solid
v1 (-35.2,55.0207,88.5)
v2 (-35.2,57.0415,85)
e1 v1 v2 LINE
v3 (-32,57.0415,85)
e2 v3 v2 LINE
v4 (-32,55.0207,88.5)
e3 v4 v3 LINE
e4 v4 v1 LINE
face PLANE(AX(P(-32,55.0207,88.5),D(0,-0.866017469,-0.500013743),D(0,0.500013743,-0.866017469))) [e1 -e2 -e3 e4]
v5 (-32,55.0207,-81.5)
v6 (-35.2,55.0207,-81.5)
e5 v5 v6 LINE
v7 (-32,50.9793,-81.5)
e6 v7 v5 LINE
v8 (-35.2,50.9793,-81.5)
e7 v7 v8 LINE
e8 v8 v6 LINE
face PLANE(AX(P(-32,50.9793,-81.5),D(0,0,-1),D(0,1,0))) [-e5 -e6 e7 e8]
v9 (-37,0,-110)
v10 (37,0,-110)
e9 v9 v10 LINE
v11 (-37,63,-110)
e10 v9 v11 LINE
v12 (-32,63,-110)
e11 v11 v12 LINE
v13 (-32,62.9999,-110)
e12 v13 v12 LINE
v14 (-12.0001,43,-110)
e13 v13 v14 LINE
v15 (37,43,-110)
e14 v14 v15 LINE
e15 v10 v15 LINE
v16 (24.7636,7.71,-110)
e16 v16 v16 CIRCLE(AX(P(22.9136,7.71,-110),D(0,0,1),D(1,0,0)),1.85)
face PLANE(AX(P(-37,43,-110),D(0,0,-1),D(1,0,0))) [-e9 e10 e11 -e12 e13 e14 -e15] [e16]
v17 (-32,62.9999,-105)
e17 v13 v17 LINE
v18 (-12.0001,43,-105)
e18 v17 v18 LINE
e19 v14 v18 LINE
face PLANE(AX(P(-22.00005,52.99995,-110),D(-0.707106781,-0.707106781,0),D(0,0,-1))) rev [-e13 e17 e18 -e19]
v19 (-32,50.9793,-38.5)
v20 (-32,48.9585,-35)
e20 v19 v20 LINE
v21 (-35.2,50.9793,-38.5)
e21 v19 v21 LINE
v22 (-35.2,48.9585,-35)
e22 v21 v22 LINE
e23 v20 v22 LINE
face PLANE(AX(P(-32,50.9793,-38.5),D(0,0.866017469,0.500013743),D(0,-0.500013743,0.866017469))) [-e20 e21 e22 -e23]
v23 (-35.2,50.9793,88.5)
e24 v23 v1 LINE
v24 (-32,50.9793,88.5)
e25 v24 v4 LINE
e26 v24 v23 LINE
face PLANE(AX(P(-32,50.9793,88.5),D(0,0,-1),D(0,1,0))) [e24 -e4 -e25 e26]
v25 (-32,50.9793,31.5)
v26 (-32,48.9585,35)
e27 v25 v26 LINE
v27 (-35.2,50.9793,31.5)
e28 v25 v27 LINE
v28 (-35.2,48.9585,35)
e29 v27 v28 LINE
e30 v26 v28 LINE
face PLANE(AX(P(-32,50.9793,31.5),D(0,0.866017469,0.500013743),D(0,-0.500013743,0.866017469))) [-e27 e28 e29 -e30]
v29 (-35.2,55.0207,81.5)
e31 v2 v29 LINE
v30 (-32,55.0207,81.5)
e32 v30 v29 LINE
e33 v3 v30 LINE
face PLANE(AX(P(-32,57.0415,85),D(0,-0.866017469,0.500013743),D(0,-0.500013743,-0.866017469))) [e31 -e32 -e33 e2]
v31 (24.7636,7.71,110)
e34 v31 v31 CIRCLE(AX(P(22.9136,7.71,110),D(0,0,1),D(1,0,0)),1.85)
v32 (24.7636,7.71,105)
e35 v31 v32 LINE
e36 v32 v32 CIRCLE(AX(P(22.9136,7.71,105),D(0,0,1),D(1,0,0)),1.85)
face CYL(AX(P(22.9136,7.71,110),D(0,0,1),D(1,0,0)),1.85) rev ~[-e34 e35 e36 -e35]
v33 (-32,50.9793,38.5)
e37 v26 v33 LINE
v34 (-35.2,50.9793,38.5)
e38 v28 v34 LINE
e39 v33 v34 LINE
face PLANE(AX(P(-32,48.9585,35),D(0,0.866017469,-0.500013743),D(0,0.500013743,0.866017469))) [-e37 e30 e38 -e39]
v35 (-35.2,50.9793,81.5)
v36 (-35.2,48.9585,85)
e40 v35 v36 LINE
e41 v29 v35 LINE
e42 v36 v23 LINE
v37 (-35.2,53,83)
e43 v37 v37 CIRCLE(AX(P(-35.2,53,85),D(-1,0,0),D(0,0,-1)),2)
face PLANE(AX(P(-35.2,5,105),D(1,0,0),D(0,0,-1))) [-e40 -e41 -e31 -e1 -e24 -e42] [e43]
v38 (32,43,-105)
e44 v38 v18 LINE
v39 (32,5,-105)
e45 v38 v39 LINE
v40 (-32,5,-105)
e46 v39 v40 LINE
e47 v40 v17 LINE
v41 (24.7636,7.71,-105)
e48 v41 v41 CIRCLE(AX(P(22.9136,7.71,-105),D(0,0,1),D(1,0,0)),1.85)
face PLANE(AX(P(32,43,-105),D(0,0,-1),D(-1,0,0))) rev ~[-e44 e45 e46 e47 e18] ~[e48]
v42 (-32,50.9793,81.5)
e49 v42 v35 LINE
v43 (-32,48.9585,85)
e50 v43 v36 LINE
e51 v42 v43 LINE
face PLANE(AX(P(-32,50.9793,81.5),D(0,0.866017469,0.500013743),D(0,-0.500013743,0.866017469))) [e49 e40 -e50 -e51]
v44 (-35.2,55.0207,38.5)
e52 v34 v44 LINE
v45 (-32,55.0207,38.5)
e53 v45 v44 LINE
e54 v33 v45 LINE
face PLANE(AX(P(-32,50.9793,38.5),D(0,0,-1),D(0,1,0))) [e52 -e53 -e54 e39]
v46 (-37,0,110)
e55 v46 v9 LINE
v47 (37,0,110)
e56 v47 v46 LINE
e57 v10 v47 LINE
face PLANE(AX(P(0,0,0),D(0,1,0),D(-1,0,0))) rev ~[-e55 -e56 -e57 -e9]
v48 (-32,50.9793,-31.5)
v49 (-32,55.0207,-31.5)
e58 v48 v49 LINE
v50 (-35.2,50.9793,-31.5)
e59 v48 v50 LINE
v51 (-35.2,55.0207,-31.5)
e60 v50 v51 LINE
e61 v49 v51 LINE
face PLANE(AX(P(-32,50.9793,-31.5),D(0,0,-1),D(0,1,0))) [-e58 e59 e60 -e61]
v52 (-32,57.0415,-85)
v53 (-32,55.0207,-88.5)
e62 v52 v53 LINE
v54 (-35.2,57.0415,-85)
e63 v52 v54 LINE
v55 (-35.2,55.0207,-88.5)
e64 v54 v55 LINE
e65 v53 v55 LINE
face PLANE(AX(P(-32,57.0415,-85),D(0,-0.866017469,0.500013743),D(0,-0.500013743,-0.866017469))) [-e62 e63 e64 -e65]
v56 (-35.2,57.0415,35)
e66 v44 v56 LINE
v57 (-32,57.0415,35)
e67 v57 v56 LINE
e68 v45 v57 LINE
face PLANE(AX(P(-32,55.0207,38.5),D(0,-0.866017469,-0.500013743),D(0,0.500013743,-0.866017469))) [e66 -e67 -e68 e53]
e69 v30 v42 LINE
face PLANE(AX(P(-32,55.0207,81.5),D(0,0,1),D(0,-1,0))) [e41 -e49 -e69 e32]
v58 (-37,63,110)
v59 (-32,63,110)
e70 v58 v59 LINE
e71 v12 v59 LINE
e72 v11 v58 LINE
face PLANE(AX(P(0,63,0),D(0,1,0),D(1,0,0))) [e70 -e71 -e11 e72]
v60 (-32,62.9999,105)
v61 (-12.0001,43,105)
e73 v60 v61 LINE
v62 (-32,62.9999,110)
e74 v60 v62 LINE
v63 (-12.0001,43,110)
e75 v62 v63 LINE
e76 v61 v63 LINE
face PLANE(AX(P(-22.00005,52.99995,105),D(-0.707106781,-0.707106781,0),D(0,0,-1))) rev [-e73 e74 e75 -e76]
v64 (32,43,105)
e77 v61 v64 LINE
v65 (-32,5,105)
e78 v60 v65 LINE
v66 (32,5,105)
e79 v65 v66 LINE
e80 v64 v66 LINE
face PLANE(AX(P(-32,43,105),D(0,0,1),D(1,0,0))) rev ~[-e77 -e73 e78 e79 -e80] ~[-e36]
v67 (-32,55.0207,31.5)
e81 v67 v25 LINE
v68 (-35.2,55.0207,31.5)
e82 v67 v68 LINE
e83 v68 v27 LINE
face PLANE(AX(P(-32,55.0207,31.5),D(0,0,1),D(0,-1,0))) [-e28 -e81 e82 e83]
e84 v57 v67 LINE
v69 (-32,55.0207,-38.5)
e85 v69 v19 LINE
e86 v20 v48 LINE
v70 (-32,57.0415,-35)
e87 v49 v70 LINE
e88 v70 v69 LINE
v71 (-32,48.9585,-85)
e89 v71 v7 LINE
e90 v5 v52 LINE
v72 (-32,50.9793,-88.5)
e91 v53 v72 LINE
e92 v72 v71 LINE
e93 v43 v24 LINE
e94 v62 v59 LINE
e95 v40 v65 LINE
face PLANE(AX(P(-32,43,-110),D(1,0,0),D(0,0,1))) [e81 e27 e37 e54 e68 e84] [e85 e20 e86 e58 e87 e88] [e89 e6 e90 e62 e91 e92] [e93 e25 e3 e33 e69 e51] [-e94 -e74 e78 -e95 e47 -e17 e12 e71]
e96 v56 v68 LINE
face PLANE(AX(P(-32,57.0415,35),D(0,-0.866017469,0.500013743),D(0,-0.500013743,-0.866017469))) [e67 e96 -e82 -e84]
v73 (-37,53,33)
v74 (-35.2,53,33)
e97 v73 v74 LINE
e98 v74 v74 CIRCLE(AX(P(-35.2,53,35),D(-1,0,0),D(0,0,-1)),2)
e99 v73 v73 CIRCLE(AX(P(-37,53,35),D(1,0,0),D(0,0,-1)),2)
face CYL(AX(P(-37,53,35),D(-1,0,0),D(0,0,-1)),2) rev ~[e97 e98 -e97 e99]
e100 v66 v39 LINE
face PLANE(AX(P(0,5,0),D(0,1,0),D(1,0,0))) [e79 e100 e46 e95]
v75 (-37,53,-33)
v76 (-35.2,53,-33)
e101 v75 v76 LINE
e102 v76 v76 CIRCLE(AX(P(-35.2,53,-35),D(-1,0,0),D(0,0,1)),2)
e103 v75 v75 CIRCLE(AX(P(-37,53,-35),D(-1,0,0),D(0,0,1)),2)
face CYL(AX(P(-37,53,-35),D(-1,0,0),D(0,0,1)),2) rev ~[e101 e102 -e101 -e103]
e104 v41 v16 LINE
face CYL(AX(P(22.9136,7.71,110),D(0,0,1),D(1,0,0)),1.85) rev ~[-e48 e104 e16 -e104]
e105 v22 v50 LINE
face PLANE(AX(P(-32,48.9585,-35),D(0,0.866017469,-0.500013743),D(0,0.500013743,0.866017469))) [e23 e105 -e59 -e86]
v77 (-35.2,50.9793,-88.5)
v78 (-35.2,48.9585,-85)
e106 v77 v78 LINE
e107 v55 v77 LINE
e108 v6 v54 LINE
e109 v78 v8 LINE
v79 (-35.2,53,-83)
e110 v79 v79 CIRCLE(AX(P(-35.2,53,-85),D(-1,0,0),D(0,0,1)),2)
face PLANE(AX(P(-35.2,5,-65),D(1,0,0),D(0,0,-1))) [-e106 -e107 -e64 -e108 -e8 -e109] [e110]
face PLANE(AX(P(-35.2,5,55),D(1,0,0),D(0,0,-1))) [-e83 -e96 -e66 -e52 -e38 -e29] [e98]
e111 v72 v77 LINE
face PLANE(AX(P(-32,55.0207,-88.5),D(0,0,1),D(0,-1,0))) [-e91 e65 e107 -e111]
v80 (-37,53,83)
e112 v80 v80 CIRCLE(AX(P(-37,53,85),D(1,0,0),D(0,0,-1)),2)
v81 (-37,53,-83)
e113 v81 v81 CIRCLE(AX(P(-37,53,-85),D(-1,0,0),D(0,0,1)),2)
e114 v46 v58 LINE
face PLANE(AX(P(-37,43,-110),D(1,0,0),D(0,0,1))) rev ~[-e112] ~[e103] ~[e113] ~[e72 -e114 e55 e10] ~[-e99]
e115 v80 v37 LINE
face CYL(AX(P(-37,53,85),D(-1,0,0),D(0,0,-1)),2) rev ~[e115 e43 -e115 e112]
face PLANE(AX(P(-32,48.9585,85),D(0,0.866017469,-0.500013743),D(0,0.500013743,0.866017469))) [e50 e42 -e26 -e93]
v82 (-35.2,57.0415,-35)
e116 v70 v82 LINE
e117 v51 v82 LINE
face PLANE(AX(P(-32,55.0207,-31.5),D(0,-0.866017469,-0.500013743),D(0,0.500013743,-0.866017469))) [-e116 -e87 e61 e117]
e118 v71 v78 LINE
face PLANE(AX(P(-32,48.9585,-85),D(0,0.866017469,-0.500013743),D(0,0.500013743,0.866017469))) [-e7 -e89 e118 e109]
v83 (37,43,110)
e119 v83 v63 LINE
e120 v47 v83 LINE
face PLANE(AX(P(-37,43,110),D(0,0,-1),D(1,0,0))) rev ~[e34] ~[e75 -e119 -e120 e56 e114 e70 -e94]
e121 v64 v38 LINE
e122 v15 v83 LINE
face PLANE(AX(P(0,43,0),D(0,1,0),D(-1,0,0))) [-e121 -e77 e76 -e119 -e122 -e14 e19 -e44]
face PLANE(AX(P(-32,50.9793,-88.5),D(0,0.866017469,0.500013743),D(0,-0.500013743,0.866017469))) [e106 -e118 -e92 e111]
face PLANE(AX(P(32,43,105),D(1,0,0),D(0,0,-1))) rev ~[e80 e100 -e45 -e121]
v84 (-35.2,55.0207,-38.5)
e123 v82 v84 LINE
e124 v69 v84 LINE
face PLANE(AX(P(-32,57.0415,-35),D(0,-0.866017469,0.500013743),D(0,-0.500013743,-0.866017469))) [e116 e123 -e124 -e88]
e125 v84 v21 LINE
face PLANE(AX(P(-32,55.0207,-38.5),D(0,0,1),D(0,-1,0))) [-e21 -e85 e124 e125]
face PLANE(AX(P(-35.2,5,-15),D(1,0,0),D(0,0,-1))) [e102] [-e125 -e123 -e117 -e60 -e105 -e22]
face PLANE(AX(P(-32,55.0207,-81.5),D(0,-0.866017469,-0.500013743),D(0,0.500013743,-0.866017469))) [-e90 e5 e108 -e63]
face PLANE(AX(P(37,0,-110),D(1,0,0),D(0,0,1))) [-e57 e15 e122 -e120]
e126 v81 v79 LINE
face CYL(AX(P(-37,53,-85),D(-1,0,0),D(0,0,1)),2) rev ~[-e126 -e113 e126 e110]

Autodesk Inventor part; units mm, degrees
ref_plane "YZ Plane" through (0, 0, 0) normal (1, 0, 0) x (0, 1, 0)
ref_plane "XZ Plane" through (0, 0, 0) normal (0, 1, 0) x (-1, 0, 0)
ref_plane "XY Plane" through (0, 0, 0) normal (0, 0, 1) x (1, 0, 0)
sketch "Эскиз1" plane through (0, 0, 0) normal (0, 1, 0) x (-1, 0, 0)
  line L0 (-37, 110) -> (37, 110)
  line L1 (37, 110) -> (37, -110)
  line L2 (37, -110) -> (-37, -110)
  line L3 (-37, -110) -> (-37, 110)
  line L4 (-37, 110) -> (37, -110) construction
  line L5 (37, 110) -> (-37, -110) construction
  point P0 (0, 0)
  dimension "d0" = 74
  dimension "d1" = 220
extrude "Выдавливание1" add sketch "Эскиз1" along normal blind 43
sketch "Эскиз3" plane through (0, 43, 0) normal (0, 1, 0) x (1, 0, 0)
  line L0 (-32, -105) -> (32, -105)
  line L1 (32, -105) -> (32, 105)
  line L2 (32, 105) -> (-32, 105)
  line L3 (-32, 105) -> (-32, -105)
  line L4 (-32, -105) -> (32, 105) construction
  line L5 (32, -105) -> (-32, 105) construction
  line L6 (37, 110) -> (-37, 110) projected
  line L7 (-37, 110) -> (-37, -110) projected
  point P0 (0, 0)
  dimension "d4" = 5
  dimension "d5" = 5
extrude "Выдавливание2" cut sketch "Эскиз3" against normal blind 38
sketch "Эскиз4" plane through (0, 5, 0) normal (0, 1, 0) x (1, 0, 0)
  line L0 (32, 105) -> (32, -105) projected
  line L1 (32, 105) -> (0, 105)
  line L2 (0, 105) -> (0, 67.1211)
  line L3 (0, 67.1211) -> (32, 67.1211)
  line L4 (32, 67.1211) -> (32, 105)
  point P0 (0, 0)
sketch "Эскиз5" plane through (0, 43, 0) normal (0, 1, 0) x (1, 0, 0)
  line L0 (-37, 110) -> (-37, -110) projected
  line L1 (-37, -110) -> (37, -110) projected
  line L2 (-37, 110) -> (-32, 110)
  line L3 (-32, 110) -> (-32, -110)
  line L4 (-32, -110) -> (-37, -110)
  line L5 (-37, -110) -> (-37, 110)
  line L6 (-32, -105) -> (-32, 105) projected
  point P0 (0, 0)
  point P1 (-32, 0)
extrude "Выдавливание3" add sketch "Эскиз5" along normal blind 20
chamfer "Фаска1" distance 20 angle 45 2 edges at (-32, 43, -107.5) (-32, 43, 107.5)
sketch "Эскиз6" plane through (-37, 0, -110) normal (-1, 0, 0) x (0, 0, 1)
  circle A0 centre (25, 53) radius 2
  circle A1 centre (75, 53) radius 2
  line L0 (0, 63) -> (220, 63) projected
  point P0 (110, 0)
  dimension "d13" = 4
  dimension "d14" = 4
  dimension "d15" = 10
  dimension "d16" = 50
  dimension "d19" = 35
extrude "Выдавливание4" cut sketch "Эскиз6" against normal blind 10
mirror "Зеркальное отражение1" about plane through (0, 0, 0) normal (0, 0, 1) of "Выдавливание4"
sketch "Эскиз7" plane through (-37, 0, 110) normal (0, 0, 1) x (1, 0, 0)
  circle A0 centre (59.9136, 7.71) radius 1.85 projected
  point P0 (37, 0)
extrude "Выдавливание5" cut sketch "Эскиз7" against normal through all
sketch "Эскиз8" plane through (-32, 5, 105) normal (1, 0, 0) x (0, 0, -1)
  circle A0 centre (20, 48) radius 2 projected
  line L0 (20, 52.0415) -> (23.5, 50.0207)
  line L1 (23.5, 50.0207) -> (23.5, 45.9793)
  line L2 (23.5, 45.9793) -> (20, 43.9585)
  line L3 (20, 43.9585) -> (16.5, 45.9793)
  line L4 (16.5, 45.9793) -> (16.5, 50.0207)
  line L5 (16.5, 50.0207) -> (20, 52.0415)
  point P0 (105, -5)
  dimension "d22" = 7
extrude "Выдавливание6" cut sketch "Эскиз8" against normal blind 3.2 contours A0 | L0 L1 L2 L3 L4 L5
sketch "Эскиз9" plane through (-32, 5, 105) normal (1, 0, 0) x (0, 0, -1)
  circle A0 centre (70, 48) radius 2 projected
  circle A1 centre (140, 48) radius 2 projected
  circle A2 centre (190, 48) radius 2 projected
  point P0 (105, -5)
pattern_sketch "Массив по эскизу1" of "Выдавливание6" from (-32, 53, 85) copies at (-32, 53, 35) at (-32, 53, -35) at (-32, 53, -85)
properties part number "KB33-046-008-001 - Корпус"
